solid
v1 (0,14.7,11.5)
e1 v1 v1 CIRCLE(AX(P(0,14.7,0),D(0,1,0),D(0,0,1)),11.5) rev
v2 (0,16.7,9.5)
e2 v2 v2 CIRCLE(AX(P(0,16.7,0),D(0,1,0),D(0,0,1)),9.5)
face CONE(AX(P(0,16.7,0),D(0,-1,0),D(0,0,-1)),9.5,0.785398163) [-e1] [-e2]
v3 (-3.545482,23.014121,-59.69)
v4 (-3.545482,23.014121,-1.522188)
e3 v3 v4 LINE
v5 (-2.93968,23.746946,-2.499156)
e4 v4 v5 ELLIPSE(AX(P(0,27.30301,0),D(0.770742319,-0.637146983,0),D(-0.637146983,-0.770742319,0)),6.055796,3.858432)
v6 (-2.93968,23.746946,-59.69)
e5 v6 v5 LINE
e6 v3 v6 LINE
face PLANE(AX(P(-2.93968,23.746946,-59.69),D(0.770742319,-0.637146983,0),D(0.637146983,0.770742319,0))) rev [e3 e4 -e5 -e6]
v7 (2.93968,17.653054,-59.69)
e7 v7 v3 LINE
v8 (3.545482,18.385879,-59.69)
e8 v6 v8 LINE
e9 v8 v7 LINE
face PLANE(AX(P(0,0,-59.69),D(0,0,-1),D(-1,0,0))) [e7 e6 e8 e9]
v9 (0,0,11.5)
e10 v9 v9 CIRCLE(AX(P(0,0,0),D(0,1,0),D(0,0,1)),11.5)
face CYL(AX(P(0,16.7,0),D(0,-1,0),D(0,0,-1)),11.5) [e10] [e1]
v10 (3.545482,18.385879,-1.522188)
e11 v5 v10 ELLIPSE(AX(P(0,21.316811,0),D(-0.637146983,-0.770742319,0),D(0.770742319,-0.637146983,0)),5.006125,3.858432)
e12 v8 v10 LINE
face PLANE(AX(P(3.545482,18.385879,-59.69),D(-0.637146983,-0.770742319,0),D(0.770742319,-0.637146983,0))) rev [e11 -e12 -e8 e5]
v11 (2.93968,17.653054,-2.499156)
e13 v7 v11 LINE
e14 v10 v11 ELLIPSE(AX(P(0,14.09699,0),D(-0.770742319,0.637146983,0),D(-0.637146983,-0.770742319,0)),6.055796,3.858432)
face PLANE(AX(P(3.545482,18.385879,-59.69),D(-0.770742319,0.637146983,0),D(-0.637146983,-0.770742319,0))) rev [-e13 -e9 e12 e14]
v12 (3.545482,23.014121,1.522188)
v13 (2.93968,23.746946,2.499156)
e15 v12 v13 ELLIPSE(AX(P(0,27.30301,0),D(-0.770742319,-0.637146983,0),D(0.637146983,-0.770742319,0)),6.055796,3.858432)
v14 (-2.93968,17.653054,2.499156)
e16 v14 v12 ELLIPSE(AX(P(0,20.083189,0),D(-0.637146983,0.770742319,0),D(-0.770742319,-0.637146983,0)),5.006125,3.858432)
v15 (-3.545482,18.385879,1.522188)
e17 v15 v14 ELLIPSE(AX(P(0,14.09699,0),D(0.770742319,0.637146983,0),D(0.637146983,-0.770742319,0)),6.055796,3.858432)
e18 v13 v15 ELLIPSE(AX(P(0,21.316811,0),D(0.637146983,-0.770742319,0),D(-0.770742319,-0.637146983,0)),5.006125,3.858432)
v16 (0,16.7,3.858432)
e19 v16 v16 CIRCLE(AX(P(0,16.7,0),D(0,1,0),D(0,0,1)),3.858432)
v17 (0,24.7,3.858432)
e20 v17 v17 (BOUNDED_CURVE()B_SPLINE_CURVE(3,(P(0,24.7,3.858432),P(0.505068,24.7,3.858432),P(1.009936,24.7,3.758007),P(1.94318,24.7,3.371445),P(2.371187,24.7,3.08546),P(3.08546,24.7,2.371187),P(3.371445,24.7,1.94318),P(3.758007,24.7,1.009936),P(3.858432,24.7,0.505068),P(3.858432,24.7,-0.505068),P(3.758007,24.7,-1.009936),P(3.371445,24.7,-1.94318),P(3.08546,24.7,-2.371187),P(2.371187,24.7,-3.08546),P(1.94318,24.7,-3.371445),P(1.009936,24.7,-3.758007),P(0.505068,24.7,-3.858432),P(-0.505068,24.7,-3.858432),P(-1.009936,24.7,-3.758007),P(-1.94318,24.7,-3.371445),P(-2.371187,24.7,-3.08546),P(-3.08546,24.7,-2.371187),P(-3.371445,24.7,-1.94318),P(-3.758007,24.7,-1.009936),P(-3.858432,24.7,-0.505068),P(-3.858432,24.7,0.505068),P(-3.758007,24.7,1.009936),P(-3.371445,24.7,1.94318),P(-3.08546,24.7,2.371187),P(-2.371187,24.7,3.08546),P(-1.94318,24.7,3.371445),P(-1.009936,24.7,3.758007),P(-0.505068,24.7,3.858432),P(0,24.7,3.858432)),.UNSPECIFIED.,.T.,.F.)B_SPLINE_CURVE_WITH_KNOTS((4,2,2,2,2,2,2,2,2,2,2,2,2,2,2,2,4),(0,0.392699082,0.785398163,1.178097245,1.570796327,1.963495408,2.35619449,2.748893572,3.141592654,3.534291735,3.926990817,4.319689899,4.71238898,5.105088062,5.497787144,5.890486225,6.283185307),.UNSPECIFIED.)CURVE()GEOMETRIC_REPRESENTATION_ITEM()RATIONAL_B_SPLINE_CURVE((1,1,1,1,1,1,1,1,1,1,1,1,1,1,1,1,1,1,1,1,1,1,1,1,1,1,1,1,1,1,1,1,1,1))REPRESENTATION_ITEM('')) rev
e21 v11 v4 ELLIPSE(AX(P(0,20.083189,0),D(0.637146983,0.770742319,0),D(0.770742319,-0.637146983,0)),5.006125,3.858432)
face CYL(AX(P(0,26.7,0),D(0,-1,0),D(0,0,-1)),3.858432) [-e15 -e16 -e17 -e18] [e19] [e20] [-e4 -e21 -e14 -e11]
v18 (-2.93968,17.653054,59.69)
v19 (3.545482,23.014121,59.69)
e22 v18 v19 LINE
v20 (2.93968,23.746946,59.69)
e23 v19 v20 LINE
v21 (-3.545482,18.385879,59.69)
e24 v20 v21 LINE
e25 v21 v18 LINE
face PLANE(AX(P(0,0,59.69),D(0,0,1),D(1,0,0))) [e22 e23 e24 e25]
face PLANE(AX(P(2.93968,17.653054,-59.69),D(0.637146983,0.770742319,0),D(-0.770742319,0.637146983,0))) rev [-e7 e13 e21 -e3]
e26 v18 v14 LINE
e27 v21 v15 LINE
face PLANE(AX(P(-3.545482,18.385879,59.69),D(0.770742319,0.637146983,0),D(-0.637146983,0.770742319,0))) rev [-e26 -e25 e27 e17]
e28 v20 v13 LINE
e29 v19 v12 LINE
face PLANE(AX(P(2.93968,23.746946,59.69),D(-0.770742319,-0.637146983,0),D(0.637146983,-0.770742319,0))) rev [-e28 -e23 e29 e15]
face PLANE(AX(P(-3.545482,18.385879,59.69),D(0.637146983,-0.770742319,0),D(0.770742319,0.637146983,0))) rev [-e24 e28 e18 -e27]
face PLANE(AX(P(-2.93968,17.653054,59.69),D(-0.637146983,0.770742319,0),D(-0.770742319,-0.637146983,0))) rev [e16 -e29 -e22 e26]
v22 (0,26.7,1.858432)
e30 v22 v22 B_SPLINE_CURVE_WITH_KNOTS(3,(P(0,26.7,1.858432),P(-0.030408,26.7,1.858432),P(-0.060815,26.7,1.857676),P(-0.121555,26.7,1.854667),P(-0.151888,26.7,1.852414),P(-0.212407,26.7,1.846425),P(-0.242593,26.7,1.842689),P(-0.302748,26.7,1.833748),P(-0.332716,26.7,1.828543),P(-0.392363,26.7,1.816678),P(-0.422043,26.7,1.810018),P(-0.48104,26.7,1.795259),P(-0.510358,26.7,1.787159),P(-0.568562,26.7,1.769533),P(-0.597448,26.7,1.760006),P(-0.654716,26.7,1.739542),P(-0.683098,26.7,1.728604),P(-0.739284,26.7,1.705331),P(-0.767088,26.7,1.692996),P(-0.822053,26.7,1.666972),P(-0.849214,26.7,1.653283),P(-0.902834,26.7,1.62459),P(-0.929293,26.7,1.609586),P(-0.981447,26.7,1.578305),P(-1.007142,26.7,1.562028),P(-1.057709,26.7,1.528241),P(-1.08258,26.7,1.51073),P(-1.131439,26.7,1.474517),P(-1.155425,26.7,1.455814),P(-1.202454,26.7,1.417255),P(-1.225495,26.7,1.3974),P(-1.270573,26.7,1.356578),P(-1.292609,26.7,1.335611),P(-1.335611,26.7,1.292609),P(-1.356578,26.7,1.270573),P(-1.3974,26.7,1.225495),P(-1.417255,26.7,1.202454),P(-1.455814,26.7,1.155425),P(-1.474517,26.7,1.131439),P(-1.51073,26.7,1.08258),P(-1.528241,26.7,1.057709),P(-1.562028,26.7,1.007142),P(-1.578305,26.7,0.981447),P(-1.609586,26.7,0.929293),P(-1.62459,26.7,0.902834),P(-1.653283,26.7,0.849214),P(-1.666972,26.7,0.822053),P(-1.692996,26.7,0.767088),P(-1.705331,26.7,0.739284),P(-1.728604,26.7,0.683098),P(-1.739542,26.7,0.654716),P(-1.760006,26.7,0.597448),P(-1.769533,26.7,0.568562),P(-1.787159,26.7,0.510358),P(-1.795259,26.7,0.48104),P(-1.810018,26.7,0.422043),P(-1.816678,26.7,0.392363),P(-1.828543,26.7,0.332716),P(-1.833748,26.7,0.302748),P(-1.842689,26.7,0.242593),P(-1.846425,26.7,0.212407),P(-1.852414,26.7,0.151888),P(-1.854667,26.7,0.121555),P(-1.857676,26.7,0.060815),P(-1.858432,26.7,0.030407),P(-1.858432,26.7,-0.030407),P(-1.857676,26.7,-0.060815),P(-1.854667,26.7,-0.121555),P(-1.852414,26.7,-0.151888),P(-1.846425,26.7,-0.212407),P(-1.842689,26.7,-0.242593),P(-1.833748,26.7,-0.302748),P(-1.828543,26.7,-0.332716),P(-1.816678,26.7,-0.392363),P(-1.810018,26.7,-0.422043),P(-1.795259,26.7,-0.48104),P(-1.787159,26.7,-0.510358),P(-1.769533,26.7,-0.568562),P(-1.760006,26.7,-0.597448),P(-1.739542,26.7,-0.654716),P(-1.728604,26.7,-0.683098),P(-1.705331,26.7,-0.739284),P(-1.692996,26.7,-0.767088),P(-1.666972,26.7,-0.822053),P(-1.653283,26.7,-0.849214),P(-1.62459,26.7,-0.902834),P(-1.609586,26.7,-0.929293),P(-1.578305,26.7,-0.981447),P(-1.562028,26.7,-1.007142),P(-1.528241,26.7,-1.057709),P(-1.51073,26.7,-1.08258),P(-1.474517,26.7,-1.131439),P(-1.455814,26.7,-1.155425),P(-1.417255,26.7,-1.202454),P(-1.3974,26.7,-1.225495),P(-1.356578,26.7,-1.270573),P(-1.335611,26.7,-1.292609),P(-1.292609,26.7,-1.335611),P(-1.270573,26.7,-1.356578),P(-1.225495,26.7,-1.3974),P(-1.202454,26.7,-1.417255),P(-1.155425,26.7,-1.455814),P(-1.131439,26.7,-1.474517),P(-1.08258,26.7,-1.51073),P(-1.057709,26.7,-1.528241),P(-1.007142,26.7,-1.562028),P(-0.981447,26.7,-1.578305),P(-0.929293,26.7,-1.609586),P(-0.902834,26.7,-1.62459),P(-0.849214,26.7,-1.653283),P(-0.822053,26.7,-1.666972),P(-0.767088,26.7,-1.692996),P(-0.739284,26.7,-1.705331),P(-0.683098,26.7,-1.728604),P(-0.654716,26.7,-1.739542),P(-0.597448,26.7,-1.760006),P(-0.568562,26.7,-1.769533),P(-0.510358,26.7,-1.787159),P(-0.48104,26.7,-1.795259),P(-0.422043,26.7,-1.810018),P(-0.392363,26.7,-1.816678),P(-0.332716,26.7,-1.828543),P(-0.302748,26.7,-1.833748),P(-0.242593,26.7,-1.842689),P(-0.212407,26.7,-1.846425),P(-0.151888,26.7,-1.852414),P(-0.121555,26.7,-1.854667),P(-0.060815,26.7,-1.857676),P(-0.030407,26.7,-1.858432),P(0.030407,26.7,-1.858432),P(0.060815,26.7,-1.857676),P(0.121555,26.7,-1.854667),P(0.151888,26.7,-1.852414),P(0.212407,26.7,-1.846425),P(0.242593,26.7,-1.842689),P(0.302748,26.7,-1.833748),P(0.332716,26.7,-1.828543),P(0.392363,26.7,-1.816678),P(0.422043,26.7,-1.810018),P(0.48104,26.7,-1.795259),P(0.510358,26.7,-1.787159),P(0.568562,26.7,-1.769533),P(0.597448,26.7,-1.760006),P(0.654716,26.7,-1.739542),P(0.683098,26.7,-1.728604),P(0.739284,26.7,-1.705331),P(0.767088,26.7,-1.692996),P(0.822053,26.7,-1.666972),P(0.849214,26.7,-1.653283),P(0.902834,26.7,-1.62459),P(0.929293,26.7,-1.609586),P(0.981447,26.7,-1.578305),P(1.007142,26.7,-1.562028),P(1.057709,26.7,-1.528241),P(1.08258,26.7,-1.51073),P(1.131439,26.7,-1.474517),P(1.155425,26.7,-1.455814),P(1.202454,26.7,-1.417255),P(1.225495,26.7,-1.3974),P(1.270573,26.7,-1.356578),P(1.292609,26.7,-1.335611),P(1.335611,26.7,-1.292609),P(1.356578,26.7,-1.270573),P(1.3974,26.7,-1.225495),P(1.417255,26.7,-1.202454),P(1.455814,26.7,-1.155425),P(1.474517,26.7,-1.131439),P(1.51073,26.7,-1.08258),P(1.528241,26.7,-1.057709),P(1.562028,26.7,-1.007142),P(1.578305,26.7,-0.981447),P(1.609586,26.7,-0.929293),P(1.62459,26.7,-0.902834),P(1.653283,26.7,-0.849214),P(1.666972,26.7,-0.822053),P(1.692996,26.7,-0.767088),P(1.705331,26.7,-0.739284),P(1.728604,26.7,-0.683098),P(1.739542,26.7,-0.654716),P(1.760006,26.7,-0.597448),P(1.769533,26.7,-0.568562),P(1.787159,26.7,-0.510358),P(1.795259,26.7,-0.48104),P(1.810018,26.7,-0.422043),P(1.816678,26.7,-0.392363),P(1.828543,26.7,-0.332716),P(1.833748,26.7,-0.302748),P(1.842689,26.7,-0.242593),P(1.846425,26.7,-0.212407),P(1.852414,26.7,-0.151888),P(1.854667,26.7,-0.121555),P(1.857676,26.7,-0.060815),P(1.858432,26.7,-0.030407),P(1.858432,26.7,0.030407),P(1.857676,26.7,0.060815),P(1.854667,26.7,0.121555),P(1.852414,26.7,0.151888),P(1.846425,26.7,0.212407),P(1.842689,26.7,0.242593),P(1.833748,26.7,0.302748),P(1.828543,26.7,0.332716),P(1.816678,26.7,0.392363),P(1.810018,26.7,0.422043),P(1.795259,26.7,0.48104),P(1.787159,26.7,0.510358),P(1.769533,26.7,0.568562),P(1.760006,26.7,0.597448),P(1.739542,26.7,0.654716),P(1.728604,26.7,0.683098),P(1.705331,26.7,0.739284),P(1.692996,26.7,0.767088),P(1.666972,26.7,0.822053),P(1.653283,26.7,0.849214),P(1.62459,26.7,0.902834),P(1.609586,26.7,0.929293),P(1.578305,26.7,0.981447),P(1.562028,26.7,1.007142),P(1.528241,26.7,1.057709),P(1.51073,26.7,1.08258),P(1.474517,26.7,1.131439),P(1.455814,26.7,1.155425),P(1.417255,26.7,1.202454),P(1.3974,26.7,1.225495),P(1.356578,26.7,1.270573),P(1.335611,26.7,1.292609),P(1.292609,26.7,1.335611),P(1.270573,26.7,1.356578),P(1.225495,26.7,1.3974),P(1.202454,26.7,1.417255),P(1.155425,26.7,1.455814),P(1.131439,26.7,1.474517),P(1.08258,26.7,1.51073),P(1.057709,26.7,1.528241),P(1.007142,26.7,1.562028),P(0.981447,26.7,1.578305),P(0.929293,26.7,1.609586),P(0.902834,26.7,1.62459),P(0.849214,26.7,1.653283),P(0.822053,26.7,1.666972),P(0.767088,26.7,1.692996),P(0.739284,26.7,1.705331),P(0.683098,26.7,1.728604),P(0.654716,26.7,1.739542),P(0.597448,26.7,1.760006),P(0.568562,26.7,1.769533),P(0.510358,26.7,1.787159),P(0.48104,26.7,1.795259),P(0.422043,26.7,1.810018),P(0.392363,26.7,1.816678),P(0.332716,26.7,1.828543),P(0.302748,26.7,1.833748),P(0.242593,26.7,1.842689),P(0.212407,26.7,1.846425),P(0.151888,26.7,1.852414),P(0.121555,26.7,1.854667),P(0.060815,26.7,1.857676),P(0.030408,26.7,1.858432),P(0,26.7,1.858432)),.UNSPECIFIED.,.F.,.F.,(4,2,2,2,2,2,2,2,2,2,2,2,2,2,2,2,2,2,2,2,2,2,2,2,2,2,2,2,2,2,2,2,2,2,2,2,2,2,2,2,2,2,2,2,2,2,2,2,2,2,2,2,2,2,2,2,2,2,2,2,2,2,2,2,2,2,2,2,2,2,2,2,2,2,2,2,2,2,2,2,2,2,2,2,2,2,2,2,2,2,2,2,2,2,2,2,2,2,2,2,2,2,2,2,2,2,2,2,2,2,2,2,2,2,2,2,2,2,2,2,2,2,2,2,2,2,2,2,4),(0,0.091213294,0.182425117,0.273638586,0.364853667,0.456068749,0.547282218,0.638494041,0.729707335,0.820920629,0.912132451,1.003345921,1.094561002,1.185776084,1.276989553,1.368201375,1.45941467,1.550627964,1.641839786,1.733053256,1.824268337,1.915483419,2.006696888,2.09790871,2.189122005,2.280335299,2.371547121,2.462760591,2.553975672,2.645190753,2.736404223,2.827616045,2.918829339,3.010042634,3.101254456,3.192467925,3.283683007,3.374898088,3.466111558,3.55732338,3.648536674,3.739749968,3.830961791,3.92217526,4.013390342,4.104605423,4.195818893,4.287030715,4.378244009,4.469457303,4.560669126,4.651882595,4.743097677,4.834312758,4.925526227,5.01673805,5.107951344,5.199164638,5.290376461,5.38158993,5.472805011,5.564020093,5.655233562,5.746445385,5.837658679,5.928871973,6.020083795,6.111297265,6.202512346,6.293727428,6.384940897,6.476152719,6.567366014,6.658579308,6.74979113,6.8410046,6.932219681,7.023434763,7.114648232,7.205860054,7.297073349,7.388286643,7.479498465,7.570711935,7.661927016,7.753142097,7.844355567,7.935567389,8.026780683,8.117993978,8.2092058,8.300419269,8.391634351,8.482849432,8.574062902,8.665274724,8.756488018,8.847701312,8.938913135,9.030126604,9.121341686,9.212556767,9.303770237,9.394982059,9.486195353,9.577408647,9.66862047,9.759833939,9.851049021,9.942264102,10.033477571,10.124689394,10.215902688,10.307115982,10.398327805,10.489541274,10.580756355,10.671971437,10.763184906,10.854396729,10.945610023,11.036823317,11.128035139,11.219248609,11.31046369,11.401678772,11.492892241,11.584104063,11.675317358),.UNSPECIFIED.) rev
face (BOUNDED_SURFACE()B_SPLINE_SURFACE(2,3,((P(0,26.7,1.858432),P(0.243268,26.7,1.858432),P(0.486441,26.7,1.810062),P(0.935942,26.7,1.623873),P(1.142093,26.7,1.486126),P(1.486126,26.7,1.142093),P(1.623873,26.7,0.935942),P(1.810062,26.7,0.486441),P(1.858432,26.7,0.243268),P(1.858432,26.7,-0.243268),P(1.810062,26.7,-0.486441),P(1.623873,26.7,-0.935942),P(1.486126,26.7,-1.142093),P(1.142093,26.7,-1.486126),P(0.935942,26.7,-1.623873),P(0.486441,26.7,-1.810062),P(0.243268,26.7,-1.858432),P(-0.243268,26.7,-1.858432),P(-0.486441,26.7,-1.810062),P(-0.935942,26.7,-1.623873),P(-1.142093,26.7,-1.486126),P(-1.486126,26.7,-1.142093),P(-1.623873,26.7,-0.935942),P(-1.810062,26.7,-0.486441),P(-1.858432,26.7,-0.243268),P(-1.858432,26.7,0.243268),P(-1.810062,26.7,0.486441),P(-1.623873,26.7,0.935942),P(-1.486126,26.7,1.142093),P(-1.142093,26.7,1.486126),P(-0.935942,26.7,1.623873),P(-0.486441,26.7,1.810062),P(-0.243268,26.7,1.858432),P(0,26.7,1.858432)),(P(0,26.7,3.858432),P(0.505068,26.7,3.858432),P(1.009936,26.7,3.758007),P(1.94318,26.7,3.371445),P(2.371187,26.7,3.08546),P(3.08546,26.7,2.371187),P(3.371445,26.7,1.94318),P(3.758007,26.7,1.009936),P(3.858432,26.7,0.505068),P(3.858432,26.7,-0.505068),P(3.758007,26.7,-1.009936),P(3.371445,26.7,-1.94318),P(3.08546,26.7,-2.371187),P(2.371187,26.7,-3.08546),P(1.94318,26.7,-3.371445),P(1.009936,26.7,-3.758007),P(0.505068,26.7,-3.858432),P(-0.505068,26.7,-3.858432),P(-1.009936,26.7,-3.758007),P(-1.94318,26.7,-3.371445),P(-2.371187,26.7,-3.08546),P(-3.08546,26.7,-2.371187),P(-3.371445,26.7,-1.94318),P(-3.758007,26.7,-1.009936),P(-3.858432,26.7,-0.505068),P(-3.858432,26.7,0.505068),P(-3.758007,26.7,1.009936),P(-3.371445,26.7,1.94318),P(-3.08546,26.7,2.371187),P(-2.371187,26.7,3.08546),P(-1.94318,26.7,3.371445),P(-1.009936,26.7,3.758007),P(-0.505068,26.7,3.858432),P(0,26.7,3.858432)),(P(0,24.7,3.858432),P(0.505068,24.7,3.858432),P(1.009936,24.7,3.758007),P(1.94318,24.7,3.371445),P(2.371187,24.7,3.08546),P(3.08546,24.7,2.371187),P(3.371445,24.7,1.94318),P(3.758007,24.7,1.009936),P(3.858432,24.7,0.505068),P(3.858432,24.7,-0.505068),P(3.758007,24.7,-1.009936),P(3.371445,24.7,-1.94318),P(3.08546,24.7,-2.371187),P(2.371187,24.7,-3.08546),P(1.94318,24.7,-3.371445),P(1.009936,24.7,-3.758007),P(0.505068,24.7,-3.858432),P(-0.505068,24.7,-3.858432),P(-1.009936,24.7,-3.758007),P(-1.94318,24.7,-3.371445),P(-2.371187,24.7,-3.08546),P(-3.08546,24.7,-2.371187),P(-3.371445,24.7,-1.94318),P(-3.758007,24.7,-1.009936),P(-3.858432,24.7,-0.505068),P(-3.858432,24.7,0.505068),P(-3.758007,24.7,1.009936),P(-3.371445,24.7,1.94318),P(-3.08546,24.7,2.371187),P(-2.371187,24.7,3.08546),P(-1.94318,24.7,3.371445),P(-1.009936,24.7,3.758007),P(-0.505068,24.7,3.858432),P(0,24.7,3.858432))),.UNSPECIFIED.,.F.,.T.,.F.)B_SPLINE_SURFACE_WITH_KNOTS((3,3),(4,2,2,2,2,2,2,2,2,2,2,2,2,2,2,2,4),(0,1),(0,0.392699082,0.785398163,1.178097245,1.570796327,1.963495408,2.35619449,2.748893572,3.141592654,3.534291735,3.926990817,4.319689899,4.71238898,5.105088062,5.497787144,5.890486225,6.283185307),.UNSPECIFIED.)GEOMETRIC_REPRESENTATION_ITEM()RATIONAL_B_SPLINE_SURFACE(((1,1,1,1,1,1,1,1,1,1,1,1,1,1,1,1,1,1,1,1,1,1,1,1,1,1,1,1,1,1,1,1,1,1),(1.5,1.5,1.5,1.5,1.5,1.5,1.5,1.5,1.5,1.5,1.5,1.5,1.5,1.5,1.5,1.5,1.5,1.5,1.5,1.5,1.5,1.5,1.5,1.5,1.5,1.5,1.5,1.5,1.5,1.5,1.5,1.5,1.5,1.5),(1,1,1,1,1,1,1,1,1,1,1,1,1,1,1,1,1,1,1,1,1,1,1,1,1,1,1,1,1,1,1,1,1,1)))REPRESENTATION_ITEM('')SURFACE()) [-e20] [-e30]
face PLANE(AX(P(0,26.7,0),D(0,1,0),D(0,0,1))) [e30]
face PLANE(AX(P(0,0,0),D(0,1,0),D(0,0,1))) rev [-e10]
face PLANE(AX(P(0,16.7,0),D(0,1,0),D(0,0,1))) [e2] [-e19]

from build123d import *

# Parameters (mm, degrees)
SKETCH1_R           = 11.5
BOSS_EXTRUDE1_DEPTH = 16.7
SKETCH2_R           = 2.5
BOSS_EXTRUDE2_DEPTH = 10
CHAMFER1_SIZE       = 2
SKETCH3_R           = 3.858432037
SKETCH3_R_2         = 2.5
BOSS_EXTRUDE3_DEPTH = 10
BOSS_EXTRUDE4_DEPTH = 59.69
CIRPATTERN1_COUNT   = 2
FILLET2_SIZE        = 2


with BuildPart() as part:
    # Sketch1 → Boss-Extrude1 (new body)
    with BuildSketch(Plane(origin=(0, 0, 0), x_dir=(1, 0, 0), z_dir=(0, 1, 0))):
        with Locations(Location((0, 0, 0), (0, 0, 270))):
            Circle(SKETCH1_R)
    extrude(amount=BOSS_EXTRUDE1_DEPTH)

    # Sketch2 → Boss-Extrude2 (add)
    with BuildSketch(Plane(origin=(0, 16.7, 0), x_dir=(1, 0, 0), z_dir=(0, 1, 0))):
        with Locations(Location((0, 0, 0), (0, 0, 270))):
            Circle(SKETCH2_R)
    extrude(amount=BOSS_EXTRUDE2_DEPTH)

    # Chamfer1
    chamfer1_edges = [part.edges().sort_by_distance(p)[0] for p in [
        (0, 16.7, -11.5),
    ]]
    chamfer(chamfer1_edges, length=CHAMFER1_SIZE)

    # Sketch3 → Boss-Extrude3 (add)
    with BuildSketch(Plane(origin=(0, 16.7, 0), x_dir=(1, 0, 0), z_dir=(0, 1, 0))):
        with Locations(Location((0, 0, 0), (0, 0, 270))):
            Circle(SKETCH3_R)
        Circle(SKETCH3_R_2, mode=Mode.SUBTRACT)
    extrude(amount=BOSS_EXTRUDE3_DEPTH)

    # Sketch4 → Boss-Extrude4 (add)
    with BuildSketch(Plane.XY):
        Polygon((-3.545481948, 18.385879185), (2.939679684, 23.746946134), (3.545481948, 23.014120815), (-2.939679684, 17.653053866), align=None)
    boss_extrude4 = extrude(amount=BOSS_EXTRUDE4_DEPTH)

    # CirPattern1: Boss-Extrude4 ×2 about axis
    cirpattern1_axis = Axis((0, 0, 0), (0, 1, 0))
    for i in range(1, CIRPATTERN1_COUNT):
        add(boss_extrude4.rotate(cirpattern1_axis, i * 360 / CIRPATTERN1_COUNT))

    # Fillet2
    # a fillet whose section is not a circle: 2 mm, written as the material it takes off along each edge
    with BuildSketch(Plane(origin=(0, 26.7, 0), x_dir=(0, 0, 1), z_dir=(-1, 0, 0))) as fillet2_piece_1:
        with BuildLine():
            Bezier((3.858432037, -FILLET2_SIZE), (3.858432037, 0), (3.858432037 - FILLET2_SIZE, 0), weights=[1, 1.5, 1])
            Line((3.858432037 - FILLET2_SIZE, 0), (3.858432037, 0))
            Line((3.858432037, 0), (3.858432037, -FILLET2_SIZE))
        make_face()
    revolve(axis=Axis((0, 26.7, 0), (0, 1, 0)), mode=Mode.SUBTRACT)


solid = part.part
